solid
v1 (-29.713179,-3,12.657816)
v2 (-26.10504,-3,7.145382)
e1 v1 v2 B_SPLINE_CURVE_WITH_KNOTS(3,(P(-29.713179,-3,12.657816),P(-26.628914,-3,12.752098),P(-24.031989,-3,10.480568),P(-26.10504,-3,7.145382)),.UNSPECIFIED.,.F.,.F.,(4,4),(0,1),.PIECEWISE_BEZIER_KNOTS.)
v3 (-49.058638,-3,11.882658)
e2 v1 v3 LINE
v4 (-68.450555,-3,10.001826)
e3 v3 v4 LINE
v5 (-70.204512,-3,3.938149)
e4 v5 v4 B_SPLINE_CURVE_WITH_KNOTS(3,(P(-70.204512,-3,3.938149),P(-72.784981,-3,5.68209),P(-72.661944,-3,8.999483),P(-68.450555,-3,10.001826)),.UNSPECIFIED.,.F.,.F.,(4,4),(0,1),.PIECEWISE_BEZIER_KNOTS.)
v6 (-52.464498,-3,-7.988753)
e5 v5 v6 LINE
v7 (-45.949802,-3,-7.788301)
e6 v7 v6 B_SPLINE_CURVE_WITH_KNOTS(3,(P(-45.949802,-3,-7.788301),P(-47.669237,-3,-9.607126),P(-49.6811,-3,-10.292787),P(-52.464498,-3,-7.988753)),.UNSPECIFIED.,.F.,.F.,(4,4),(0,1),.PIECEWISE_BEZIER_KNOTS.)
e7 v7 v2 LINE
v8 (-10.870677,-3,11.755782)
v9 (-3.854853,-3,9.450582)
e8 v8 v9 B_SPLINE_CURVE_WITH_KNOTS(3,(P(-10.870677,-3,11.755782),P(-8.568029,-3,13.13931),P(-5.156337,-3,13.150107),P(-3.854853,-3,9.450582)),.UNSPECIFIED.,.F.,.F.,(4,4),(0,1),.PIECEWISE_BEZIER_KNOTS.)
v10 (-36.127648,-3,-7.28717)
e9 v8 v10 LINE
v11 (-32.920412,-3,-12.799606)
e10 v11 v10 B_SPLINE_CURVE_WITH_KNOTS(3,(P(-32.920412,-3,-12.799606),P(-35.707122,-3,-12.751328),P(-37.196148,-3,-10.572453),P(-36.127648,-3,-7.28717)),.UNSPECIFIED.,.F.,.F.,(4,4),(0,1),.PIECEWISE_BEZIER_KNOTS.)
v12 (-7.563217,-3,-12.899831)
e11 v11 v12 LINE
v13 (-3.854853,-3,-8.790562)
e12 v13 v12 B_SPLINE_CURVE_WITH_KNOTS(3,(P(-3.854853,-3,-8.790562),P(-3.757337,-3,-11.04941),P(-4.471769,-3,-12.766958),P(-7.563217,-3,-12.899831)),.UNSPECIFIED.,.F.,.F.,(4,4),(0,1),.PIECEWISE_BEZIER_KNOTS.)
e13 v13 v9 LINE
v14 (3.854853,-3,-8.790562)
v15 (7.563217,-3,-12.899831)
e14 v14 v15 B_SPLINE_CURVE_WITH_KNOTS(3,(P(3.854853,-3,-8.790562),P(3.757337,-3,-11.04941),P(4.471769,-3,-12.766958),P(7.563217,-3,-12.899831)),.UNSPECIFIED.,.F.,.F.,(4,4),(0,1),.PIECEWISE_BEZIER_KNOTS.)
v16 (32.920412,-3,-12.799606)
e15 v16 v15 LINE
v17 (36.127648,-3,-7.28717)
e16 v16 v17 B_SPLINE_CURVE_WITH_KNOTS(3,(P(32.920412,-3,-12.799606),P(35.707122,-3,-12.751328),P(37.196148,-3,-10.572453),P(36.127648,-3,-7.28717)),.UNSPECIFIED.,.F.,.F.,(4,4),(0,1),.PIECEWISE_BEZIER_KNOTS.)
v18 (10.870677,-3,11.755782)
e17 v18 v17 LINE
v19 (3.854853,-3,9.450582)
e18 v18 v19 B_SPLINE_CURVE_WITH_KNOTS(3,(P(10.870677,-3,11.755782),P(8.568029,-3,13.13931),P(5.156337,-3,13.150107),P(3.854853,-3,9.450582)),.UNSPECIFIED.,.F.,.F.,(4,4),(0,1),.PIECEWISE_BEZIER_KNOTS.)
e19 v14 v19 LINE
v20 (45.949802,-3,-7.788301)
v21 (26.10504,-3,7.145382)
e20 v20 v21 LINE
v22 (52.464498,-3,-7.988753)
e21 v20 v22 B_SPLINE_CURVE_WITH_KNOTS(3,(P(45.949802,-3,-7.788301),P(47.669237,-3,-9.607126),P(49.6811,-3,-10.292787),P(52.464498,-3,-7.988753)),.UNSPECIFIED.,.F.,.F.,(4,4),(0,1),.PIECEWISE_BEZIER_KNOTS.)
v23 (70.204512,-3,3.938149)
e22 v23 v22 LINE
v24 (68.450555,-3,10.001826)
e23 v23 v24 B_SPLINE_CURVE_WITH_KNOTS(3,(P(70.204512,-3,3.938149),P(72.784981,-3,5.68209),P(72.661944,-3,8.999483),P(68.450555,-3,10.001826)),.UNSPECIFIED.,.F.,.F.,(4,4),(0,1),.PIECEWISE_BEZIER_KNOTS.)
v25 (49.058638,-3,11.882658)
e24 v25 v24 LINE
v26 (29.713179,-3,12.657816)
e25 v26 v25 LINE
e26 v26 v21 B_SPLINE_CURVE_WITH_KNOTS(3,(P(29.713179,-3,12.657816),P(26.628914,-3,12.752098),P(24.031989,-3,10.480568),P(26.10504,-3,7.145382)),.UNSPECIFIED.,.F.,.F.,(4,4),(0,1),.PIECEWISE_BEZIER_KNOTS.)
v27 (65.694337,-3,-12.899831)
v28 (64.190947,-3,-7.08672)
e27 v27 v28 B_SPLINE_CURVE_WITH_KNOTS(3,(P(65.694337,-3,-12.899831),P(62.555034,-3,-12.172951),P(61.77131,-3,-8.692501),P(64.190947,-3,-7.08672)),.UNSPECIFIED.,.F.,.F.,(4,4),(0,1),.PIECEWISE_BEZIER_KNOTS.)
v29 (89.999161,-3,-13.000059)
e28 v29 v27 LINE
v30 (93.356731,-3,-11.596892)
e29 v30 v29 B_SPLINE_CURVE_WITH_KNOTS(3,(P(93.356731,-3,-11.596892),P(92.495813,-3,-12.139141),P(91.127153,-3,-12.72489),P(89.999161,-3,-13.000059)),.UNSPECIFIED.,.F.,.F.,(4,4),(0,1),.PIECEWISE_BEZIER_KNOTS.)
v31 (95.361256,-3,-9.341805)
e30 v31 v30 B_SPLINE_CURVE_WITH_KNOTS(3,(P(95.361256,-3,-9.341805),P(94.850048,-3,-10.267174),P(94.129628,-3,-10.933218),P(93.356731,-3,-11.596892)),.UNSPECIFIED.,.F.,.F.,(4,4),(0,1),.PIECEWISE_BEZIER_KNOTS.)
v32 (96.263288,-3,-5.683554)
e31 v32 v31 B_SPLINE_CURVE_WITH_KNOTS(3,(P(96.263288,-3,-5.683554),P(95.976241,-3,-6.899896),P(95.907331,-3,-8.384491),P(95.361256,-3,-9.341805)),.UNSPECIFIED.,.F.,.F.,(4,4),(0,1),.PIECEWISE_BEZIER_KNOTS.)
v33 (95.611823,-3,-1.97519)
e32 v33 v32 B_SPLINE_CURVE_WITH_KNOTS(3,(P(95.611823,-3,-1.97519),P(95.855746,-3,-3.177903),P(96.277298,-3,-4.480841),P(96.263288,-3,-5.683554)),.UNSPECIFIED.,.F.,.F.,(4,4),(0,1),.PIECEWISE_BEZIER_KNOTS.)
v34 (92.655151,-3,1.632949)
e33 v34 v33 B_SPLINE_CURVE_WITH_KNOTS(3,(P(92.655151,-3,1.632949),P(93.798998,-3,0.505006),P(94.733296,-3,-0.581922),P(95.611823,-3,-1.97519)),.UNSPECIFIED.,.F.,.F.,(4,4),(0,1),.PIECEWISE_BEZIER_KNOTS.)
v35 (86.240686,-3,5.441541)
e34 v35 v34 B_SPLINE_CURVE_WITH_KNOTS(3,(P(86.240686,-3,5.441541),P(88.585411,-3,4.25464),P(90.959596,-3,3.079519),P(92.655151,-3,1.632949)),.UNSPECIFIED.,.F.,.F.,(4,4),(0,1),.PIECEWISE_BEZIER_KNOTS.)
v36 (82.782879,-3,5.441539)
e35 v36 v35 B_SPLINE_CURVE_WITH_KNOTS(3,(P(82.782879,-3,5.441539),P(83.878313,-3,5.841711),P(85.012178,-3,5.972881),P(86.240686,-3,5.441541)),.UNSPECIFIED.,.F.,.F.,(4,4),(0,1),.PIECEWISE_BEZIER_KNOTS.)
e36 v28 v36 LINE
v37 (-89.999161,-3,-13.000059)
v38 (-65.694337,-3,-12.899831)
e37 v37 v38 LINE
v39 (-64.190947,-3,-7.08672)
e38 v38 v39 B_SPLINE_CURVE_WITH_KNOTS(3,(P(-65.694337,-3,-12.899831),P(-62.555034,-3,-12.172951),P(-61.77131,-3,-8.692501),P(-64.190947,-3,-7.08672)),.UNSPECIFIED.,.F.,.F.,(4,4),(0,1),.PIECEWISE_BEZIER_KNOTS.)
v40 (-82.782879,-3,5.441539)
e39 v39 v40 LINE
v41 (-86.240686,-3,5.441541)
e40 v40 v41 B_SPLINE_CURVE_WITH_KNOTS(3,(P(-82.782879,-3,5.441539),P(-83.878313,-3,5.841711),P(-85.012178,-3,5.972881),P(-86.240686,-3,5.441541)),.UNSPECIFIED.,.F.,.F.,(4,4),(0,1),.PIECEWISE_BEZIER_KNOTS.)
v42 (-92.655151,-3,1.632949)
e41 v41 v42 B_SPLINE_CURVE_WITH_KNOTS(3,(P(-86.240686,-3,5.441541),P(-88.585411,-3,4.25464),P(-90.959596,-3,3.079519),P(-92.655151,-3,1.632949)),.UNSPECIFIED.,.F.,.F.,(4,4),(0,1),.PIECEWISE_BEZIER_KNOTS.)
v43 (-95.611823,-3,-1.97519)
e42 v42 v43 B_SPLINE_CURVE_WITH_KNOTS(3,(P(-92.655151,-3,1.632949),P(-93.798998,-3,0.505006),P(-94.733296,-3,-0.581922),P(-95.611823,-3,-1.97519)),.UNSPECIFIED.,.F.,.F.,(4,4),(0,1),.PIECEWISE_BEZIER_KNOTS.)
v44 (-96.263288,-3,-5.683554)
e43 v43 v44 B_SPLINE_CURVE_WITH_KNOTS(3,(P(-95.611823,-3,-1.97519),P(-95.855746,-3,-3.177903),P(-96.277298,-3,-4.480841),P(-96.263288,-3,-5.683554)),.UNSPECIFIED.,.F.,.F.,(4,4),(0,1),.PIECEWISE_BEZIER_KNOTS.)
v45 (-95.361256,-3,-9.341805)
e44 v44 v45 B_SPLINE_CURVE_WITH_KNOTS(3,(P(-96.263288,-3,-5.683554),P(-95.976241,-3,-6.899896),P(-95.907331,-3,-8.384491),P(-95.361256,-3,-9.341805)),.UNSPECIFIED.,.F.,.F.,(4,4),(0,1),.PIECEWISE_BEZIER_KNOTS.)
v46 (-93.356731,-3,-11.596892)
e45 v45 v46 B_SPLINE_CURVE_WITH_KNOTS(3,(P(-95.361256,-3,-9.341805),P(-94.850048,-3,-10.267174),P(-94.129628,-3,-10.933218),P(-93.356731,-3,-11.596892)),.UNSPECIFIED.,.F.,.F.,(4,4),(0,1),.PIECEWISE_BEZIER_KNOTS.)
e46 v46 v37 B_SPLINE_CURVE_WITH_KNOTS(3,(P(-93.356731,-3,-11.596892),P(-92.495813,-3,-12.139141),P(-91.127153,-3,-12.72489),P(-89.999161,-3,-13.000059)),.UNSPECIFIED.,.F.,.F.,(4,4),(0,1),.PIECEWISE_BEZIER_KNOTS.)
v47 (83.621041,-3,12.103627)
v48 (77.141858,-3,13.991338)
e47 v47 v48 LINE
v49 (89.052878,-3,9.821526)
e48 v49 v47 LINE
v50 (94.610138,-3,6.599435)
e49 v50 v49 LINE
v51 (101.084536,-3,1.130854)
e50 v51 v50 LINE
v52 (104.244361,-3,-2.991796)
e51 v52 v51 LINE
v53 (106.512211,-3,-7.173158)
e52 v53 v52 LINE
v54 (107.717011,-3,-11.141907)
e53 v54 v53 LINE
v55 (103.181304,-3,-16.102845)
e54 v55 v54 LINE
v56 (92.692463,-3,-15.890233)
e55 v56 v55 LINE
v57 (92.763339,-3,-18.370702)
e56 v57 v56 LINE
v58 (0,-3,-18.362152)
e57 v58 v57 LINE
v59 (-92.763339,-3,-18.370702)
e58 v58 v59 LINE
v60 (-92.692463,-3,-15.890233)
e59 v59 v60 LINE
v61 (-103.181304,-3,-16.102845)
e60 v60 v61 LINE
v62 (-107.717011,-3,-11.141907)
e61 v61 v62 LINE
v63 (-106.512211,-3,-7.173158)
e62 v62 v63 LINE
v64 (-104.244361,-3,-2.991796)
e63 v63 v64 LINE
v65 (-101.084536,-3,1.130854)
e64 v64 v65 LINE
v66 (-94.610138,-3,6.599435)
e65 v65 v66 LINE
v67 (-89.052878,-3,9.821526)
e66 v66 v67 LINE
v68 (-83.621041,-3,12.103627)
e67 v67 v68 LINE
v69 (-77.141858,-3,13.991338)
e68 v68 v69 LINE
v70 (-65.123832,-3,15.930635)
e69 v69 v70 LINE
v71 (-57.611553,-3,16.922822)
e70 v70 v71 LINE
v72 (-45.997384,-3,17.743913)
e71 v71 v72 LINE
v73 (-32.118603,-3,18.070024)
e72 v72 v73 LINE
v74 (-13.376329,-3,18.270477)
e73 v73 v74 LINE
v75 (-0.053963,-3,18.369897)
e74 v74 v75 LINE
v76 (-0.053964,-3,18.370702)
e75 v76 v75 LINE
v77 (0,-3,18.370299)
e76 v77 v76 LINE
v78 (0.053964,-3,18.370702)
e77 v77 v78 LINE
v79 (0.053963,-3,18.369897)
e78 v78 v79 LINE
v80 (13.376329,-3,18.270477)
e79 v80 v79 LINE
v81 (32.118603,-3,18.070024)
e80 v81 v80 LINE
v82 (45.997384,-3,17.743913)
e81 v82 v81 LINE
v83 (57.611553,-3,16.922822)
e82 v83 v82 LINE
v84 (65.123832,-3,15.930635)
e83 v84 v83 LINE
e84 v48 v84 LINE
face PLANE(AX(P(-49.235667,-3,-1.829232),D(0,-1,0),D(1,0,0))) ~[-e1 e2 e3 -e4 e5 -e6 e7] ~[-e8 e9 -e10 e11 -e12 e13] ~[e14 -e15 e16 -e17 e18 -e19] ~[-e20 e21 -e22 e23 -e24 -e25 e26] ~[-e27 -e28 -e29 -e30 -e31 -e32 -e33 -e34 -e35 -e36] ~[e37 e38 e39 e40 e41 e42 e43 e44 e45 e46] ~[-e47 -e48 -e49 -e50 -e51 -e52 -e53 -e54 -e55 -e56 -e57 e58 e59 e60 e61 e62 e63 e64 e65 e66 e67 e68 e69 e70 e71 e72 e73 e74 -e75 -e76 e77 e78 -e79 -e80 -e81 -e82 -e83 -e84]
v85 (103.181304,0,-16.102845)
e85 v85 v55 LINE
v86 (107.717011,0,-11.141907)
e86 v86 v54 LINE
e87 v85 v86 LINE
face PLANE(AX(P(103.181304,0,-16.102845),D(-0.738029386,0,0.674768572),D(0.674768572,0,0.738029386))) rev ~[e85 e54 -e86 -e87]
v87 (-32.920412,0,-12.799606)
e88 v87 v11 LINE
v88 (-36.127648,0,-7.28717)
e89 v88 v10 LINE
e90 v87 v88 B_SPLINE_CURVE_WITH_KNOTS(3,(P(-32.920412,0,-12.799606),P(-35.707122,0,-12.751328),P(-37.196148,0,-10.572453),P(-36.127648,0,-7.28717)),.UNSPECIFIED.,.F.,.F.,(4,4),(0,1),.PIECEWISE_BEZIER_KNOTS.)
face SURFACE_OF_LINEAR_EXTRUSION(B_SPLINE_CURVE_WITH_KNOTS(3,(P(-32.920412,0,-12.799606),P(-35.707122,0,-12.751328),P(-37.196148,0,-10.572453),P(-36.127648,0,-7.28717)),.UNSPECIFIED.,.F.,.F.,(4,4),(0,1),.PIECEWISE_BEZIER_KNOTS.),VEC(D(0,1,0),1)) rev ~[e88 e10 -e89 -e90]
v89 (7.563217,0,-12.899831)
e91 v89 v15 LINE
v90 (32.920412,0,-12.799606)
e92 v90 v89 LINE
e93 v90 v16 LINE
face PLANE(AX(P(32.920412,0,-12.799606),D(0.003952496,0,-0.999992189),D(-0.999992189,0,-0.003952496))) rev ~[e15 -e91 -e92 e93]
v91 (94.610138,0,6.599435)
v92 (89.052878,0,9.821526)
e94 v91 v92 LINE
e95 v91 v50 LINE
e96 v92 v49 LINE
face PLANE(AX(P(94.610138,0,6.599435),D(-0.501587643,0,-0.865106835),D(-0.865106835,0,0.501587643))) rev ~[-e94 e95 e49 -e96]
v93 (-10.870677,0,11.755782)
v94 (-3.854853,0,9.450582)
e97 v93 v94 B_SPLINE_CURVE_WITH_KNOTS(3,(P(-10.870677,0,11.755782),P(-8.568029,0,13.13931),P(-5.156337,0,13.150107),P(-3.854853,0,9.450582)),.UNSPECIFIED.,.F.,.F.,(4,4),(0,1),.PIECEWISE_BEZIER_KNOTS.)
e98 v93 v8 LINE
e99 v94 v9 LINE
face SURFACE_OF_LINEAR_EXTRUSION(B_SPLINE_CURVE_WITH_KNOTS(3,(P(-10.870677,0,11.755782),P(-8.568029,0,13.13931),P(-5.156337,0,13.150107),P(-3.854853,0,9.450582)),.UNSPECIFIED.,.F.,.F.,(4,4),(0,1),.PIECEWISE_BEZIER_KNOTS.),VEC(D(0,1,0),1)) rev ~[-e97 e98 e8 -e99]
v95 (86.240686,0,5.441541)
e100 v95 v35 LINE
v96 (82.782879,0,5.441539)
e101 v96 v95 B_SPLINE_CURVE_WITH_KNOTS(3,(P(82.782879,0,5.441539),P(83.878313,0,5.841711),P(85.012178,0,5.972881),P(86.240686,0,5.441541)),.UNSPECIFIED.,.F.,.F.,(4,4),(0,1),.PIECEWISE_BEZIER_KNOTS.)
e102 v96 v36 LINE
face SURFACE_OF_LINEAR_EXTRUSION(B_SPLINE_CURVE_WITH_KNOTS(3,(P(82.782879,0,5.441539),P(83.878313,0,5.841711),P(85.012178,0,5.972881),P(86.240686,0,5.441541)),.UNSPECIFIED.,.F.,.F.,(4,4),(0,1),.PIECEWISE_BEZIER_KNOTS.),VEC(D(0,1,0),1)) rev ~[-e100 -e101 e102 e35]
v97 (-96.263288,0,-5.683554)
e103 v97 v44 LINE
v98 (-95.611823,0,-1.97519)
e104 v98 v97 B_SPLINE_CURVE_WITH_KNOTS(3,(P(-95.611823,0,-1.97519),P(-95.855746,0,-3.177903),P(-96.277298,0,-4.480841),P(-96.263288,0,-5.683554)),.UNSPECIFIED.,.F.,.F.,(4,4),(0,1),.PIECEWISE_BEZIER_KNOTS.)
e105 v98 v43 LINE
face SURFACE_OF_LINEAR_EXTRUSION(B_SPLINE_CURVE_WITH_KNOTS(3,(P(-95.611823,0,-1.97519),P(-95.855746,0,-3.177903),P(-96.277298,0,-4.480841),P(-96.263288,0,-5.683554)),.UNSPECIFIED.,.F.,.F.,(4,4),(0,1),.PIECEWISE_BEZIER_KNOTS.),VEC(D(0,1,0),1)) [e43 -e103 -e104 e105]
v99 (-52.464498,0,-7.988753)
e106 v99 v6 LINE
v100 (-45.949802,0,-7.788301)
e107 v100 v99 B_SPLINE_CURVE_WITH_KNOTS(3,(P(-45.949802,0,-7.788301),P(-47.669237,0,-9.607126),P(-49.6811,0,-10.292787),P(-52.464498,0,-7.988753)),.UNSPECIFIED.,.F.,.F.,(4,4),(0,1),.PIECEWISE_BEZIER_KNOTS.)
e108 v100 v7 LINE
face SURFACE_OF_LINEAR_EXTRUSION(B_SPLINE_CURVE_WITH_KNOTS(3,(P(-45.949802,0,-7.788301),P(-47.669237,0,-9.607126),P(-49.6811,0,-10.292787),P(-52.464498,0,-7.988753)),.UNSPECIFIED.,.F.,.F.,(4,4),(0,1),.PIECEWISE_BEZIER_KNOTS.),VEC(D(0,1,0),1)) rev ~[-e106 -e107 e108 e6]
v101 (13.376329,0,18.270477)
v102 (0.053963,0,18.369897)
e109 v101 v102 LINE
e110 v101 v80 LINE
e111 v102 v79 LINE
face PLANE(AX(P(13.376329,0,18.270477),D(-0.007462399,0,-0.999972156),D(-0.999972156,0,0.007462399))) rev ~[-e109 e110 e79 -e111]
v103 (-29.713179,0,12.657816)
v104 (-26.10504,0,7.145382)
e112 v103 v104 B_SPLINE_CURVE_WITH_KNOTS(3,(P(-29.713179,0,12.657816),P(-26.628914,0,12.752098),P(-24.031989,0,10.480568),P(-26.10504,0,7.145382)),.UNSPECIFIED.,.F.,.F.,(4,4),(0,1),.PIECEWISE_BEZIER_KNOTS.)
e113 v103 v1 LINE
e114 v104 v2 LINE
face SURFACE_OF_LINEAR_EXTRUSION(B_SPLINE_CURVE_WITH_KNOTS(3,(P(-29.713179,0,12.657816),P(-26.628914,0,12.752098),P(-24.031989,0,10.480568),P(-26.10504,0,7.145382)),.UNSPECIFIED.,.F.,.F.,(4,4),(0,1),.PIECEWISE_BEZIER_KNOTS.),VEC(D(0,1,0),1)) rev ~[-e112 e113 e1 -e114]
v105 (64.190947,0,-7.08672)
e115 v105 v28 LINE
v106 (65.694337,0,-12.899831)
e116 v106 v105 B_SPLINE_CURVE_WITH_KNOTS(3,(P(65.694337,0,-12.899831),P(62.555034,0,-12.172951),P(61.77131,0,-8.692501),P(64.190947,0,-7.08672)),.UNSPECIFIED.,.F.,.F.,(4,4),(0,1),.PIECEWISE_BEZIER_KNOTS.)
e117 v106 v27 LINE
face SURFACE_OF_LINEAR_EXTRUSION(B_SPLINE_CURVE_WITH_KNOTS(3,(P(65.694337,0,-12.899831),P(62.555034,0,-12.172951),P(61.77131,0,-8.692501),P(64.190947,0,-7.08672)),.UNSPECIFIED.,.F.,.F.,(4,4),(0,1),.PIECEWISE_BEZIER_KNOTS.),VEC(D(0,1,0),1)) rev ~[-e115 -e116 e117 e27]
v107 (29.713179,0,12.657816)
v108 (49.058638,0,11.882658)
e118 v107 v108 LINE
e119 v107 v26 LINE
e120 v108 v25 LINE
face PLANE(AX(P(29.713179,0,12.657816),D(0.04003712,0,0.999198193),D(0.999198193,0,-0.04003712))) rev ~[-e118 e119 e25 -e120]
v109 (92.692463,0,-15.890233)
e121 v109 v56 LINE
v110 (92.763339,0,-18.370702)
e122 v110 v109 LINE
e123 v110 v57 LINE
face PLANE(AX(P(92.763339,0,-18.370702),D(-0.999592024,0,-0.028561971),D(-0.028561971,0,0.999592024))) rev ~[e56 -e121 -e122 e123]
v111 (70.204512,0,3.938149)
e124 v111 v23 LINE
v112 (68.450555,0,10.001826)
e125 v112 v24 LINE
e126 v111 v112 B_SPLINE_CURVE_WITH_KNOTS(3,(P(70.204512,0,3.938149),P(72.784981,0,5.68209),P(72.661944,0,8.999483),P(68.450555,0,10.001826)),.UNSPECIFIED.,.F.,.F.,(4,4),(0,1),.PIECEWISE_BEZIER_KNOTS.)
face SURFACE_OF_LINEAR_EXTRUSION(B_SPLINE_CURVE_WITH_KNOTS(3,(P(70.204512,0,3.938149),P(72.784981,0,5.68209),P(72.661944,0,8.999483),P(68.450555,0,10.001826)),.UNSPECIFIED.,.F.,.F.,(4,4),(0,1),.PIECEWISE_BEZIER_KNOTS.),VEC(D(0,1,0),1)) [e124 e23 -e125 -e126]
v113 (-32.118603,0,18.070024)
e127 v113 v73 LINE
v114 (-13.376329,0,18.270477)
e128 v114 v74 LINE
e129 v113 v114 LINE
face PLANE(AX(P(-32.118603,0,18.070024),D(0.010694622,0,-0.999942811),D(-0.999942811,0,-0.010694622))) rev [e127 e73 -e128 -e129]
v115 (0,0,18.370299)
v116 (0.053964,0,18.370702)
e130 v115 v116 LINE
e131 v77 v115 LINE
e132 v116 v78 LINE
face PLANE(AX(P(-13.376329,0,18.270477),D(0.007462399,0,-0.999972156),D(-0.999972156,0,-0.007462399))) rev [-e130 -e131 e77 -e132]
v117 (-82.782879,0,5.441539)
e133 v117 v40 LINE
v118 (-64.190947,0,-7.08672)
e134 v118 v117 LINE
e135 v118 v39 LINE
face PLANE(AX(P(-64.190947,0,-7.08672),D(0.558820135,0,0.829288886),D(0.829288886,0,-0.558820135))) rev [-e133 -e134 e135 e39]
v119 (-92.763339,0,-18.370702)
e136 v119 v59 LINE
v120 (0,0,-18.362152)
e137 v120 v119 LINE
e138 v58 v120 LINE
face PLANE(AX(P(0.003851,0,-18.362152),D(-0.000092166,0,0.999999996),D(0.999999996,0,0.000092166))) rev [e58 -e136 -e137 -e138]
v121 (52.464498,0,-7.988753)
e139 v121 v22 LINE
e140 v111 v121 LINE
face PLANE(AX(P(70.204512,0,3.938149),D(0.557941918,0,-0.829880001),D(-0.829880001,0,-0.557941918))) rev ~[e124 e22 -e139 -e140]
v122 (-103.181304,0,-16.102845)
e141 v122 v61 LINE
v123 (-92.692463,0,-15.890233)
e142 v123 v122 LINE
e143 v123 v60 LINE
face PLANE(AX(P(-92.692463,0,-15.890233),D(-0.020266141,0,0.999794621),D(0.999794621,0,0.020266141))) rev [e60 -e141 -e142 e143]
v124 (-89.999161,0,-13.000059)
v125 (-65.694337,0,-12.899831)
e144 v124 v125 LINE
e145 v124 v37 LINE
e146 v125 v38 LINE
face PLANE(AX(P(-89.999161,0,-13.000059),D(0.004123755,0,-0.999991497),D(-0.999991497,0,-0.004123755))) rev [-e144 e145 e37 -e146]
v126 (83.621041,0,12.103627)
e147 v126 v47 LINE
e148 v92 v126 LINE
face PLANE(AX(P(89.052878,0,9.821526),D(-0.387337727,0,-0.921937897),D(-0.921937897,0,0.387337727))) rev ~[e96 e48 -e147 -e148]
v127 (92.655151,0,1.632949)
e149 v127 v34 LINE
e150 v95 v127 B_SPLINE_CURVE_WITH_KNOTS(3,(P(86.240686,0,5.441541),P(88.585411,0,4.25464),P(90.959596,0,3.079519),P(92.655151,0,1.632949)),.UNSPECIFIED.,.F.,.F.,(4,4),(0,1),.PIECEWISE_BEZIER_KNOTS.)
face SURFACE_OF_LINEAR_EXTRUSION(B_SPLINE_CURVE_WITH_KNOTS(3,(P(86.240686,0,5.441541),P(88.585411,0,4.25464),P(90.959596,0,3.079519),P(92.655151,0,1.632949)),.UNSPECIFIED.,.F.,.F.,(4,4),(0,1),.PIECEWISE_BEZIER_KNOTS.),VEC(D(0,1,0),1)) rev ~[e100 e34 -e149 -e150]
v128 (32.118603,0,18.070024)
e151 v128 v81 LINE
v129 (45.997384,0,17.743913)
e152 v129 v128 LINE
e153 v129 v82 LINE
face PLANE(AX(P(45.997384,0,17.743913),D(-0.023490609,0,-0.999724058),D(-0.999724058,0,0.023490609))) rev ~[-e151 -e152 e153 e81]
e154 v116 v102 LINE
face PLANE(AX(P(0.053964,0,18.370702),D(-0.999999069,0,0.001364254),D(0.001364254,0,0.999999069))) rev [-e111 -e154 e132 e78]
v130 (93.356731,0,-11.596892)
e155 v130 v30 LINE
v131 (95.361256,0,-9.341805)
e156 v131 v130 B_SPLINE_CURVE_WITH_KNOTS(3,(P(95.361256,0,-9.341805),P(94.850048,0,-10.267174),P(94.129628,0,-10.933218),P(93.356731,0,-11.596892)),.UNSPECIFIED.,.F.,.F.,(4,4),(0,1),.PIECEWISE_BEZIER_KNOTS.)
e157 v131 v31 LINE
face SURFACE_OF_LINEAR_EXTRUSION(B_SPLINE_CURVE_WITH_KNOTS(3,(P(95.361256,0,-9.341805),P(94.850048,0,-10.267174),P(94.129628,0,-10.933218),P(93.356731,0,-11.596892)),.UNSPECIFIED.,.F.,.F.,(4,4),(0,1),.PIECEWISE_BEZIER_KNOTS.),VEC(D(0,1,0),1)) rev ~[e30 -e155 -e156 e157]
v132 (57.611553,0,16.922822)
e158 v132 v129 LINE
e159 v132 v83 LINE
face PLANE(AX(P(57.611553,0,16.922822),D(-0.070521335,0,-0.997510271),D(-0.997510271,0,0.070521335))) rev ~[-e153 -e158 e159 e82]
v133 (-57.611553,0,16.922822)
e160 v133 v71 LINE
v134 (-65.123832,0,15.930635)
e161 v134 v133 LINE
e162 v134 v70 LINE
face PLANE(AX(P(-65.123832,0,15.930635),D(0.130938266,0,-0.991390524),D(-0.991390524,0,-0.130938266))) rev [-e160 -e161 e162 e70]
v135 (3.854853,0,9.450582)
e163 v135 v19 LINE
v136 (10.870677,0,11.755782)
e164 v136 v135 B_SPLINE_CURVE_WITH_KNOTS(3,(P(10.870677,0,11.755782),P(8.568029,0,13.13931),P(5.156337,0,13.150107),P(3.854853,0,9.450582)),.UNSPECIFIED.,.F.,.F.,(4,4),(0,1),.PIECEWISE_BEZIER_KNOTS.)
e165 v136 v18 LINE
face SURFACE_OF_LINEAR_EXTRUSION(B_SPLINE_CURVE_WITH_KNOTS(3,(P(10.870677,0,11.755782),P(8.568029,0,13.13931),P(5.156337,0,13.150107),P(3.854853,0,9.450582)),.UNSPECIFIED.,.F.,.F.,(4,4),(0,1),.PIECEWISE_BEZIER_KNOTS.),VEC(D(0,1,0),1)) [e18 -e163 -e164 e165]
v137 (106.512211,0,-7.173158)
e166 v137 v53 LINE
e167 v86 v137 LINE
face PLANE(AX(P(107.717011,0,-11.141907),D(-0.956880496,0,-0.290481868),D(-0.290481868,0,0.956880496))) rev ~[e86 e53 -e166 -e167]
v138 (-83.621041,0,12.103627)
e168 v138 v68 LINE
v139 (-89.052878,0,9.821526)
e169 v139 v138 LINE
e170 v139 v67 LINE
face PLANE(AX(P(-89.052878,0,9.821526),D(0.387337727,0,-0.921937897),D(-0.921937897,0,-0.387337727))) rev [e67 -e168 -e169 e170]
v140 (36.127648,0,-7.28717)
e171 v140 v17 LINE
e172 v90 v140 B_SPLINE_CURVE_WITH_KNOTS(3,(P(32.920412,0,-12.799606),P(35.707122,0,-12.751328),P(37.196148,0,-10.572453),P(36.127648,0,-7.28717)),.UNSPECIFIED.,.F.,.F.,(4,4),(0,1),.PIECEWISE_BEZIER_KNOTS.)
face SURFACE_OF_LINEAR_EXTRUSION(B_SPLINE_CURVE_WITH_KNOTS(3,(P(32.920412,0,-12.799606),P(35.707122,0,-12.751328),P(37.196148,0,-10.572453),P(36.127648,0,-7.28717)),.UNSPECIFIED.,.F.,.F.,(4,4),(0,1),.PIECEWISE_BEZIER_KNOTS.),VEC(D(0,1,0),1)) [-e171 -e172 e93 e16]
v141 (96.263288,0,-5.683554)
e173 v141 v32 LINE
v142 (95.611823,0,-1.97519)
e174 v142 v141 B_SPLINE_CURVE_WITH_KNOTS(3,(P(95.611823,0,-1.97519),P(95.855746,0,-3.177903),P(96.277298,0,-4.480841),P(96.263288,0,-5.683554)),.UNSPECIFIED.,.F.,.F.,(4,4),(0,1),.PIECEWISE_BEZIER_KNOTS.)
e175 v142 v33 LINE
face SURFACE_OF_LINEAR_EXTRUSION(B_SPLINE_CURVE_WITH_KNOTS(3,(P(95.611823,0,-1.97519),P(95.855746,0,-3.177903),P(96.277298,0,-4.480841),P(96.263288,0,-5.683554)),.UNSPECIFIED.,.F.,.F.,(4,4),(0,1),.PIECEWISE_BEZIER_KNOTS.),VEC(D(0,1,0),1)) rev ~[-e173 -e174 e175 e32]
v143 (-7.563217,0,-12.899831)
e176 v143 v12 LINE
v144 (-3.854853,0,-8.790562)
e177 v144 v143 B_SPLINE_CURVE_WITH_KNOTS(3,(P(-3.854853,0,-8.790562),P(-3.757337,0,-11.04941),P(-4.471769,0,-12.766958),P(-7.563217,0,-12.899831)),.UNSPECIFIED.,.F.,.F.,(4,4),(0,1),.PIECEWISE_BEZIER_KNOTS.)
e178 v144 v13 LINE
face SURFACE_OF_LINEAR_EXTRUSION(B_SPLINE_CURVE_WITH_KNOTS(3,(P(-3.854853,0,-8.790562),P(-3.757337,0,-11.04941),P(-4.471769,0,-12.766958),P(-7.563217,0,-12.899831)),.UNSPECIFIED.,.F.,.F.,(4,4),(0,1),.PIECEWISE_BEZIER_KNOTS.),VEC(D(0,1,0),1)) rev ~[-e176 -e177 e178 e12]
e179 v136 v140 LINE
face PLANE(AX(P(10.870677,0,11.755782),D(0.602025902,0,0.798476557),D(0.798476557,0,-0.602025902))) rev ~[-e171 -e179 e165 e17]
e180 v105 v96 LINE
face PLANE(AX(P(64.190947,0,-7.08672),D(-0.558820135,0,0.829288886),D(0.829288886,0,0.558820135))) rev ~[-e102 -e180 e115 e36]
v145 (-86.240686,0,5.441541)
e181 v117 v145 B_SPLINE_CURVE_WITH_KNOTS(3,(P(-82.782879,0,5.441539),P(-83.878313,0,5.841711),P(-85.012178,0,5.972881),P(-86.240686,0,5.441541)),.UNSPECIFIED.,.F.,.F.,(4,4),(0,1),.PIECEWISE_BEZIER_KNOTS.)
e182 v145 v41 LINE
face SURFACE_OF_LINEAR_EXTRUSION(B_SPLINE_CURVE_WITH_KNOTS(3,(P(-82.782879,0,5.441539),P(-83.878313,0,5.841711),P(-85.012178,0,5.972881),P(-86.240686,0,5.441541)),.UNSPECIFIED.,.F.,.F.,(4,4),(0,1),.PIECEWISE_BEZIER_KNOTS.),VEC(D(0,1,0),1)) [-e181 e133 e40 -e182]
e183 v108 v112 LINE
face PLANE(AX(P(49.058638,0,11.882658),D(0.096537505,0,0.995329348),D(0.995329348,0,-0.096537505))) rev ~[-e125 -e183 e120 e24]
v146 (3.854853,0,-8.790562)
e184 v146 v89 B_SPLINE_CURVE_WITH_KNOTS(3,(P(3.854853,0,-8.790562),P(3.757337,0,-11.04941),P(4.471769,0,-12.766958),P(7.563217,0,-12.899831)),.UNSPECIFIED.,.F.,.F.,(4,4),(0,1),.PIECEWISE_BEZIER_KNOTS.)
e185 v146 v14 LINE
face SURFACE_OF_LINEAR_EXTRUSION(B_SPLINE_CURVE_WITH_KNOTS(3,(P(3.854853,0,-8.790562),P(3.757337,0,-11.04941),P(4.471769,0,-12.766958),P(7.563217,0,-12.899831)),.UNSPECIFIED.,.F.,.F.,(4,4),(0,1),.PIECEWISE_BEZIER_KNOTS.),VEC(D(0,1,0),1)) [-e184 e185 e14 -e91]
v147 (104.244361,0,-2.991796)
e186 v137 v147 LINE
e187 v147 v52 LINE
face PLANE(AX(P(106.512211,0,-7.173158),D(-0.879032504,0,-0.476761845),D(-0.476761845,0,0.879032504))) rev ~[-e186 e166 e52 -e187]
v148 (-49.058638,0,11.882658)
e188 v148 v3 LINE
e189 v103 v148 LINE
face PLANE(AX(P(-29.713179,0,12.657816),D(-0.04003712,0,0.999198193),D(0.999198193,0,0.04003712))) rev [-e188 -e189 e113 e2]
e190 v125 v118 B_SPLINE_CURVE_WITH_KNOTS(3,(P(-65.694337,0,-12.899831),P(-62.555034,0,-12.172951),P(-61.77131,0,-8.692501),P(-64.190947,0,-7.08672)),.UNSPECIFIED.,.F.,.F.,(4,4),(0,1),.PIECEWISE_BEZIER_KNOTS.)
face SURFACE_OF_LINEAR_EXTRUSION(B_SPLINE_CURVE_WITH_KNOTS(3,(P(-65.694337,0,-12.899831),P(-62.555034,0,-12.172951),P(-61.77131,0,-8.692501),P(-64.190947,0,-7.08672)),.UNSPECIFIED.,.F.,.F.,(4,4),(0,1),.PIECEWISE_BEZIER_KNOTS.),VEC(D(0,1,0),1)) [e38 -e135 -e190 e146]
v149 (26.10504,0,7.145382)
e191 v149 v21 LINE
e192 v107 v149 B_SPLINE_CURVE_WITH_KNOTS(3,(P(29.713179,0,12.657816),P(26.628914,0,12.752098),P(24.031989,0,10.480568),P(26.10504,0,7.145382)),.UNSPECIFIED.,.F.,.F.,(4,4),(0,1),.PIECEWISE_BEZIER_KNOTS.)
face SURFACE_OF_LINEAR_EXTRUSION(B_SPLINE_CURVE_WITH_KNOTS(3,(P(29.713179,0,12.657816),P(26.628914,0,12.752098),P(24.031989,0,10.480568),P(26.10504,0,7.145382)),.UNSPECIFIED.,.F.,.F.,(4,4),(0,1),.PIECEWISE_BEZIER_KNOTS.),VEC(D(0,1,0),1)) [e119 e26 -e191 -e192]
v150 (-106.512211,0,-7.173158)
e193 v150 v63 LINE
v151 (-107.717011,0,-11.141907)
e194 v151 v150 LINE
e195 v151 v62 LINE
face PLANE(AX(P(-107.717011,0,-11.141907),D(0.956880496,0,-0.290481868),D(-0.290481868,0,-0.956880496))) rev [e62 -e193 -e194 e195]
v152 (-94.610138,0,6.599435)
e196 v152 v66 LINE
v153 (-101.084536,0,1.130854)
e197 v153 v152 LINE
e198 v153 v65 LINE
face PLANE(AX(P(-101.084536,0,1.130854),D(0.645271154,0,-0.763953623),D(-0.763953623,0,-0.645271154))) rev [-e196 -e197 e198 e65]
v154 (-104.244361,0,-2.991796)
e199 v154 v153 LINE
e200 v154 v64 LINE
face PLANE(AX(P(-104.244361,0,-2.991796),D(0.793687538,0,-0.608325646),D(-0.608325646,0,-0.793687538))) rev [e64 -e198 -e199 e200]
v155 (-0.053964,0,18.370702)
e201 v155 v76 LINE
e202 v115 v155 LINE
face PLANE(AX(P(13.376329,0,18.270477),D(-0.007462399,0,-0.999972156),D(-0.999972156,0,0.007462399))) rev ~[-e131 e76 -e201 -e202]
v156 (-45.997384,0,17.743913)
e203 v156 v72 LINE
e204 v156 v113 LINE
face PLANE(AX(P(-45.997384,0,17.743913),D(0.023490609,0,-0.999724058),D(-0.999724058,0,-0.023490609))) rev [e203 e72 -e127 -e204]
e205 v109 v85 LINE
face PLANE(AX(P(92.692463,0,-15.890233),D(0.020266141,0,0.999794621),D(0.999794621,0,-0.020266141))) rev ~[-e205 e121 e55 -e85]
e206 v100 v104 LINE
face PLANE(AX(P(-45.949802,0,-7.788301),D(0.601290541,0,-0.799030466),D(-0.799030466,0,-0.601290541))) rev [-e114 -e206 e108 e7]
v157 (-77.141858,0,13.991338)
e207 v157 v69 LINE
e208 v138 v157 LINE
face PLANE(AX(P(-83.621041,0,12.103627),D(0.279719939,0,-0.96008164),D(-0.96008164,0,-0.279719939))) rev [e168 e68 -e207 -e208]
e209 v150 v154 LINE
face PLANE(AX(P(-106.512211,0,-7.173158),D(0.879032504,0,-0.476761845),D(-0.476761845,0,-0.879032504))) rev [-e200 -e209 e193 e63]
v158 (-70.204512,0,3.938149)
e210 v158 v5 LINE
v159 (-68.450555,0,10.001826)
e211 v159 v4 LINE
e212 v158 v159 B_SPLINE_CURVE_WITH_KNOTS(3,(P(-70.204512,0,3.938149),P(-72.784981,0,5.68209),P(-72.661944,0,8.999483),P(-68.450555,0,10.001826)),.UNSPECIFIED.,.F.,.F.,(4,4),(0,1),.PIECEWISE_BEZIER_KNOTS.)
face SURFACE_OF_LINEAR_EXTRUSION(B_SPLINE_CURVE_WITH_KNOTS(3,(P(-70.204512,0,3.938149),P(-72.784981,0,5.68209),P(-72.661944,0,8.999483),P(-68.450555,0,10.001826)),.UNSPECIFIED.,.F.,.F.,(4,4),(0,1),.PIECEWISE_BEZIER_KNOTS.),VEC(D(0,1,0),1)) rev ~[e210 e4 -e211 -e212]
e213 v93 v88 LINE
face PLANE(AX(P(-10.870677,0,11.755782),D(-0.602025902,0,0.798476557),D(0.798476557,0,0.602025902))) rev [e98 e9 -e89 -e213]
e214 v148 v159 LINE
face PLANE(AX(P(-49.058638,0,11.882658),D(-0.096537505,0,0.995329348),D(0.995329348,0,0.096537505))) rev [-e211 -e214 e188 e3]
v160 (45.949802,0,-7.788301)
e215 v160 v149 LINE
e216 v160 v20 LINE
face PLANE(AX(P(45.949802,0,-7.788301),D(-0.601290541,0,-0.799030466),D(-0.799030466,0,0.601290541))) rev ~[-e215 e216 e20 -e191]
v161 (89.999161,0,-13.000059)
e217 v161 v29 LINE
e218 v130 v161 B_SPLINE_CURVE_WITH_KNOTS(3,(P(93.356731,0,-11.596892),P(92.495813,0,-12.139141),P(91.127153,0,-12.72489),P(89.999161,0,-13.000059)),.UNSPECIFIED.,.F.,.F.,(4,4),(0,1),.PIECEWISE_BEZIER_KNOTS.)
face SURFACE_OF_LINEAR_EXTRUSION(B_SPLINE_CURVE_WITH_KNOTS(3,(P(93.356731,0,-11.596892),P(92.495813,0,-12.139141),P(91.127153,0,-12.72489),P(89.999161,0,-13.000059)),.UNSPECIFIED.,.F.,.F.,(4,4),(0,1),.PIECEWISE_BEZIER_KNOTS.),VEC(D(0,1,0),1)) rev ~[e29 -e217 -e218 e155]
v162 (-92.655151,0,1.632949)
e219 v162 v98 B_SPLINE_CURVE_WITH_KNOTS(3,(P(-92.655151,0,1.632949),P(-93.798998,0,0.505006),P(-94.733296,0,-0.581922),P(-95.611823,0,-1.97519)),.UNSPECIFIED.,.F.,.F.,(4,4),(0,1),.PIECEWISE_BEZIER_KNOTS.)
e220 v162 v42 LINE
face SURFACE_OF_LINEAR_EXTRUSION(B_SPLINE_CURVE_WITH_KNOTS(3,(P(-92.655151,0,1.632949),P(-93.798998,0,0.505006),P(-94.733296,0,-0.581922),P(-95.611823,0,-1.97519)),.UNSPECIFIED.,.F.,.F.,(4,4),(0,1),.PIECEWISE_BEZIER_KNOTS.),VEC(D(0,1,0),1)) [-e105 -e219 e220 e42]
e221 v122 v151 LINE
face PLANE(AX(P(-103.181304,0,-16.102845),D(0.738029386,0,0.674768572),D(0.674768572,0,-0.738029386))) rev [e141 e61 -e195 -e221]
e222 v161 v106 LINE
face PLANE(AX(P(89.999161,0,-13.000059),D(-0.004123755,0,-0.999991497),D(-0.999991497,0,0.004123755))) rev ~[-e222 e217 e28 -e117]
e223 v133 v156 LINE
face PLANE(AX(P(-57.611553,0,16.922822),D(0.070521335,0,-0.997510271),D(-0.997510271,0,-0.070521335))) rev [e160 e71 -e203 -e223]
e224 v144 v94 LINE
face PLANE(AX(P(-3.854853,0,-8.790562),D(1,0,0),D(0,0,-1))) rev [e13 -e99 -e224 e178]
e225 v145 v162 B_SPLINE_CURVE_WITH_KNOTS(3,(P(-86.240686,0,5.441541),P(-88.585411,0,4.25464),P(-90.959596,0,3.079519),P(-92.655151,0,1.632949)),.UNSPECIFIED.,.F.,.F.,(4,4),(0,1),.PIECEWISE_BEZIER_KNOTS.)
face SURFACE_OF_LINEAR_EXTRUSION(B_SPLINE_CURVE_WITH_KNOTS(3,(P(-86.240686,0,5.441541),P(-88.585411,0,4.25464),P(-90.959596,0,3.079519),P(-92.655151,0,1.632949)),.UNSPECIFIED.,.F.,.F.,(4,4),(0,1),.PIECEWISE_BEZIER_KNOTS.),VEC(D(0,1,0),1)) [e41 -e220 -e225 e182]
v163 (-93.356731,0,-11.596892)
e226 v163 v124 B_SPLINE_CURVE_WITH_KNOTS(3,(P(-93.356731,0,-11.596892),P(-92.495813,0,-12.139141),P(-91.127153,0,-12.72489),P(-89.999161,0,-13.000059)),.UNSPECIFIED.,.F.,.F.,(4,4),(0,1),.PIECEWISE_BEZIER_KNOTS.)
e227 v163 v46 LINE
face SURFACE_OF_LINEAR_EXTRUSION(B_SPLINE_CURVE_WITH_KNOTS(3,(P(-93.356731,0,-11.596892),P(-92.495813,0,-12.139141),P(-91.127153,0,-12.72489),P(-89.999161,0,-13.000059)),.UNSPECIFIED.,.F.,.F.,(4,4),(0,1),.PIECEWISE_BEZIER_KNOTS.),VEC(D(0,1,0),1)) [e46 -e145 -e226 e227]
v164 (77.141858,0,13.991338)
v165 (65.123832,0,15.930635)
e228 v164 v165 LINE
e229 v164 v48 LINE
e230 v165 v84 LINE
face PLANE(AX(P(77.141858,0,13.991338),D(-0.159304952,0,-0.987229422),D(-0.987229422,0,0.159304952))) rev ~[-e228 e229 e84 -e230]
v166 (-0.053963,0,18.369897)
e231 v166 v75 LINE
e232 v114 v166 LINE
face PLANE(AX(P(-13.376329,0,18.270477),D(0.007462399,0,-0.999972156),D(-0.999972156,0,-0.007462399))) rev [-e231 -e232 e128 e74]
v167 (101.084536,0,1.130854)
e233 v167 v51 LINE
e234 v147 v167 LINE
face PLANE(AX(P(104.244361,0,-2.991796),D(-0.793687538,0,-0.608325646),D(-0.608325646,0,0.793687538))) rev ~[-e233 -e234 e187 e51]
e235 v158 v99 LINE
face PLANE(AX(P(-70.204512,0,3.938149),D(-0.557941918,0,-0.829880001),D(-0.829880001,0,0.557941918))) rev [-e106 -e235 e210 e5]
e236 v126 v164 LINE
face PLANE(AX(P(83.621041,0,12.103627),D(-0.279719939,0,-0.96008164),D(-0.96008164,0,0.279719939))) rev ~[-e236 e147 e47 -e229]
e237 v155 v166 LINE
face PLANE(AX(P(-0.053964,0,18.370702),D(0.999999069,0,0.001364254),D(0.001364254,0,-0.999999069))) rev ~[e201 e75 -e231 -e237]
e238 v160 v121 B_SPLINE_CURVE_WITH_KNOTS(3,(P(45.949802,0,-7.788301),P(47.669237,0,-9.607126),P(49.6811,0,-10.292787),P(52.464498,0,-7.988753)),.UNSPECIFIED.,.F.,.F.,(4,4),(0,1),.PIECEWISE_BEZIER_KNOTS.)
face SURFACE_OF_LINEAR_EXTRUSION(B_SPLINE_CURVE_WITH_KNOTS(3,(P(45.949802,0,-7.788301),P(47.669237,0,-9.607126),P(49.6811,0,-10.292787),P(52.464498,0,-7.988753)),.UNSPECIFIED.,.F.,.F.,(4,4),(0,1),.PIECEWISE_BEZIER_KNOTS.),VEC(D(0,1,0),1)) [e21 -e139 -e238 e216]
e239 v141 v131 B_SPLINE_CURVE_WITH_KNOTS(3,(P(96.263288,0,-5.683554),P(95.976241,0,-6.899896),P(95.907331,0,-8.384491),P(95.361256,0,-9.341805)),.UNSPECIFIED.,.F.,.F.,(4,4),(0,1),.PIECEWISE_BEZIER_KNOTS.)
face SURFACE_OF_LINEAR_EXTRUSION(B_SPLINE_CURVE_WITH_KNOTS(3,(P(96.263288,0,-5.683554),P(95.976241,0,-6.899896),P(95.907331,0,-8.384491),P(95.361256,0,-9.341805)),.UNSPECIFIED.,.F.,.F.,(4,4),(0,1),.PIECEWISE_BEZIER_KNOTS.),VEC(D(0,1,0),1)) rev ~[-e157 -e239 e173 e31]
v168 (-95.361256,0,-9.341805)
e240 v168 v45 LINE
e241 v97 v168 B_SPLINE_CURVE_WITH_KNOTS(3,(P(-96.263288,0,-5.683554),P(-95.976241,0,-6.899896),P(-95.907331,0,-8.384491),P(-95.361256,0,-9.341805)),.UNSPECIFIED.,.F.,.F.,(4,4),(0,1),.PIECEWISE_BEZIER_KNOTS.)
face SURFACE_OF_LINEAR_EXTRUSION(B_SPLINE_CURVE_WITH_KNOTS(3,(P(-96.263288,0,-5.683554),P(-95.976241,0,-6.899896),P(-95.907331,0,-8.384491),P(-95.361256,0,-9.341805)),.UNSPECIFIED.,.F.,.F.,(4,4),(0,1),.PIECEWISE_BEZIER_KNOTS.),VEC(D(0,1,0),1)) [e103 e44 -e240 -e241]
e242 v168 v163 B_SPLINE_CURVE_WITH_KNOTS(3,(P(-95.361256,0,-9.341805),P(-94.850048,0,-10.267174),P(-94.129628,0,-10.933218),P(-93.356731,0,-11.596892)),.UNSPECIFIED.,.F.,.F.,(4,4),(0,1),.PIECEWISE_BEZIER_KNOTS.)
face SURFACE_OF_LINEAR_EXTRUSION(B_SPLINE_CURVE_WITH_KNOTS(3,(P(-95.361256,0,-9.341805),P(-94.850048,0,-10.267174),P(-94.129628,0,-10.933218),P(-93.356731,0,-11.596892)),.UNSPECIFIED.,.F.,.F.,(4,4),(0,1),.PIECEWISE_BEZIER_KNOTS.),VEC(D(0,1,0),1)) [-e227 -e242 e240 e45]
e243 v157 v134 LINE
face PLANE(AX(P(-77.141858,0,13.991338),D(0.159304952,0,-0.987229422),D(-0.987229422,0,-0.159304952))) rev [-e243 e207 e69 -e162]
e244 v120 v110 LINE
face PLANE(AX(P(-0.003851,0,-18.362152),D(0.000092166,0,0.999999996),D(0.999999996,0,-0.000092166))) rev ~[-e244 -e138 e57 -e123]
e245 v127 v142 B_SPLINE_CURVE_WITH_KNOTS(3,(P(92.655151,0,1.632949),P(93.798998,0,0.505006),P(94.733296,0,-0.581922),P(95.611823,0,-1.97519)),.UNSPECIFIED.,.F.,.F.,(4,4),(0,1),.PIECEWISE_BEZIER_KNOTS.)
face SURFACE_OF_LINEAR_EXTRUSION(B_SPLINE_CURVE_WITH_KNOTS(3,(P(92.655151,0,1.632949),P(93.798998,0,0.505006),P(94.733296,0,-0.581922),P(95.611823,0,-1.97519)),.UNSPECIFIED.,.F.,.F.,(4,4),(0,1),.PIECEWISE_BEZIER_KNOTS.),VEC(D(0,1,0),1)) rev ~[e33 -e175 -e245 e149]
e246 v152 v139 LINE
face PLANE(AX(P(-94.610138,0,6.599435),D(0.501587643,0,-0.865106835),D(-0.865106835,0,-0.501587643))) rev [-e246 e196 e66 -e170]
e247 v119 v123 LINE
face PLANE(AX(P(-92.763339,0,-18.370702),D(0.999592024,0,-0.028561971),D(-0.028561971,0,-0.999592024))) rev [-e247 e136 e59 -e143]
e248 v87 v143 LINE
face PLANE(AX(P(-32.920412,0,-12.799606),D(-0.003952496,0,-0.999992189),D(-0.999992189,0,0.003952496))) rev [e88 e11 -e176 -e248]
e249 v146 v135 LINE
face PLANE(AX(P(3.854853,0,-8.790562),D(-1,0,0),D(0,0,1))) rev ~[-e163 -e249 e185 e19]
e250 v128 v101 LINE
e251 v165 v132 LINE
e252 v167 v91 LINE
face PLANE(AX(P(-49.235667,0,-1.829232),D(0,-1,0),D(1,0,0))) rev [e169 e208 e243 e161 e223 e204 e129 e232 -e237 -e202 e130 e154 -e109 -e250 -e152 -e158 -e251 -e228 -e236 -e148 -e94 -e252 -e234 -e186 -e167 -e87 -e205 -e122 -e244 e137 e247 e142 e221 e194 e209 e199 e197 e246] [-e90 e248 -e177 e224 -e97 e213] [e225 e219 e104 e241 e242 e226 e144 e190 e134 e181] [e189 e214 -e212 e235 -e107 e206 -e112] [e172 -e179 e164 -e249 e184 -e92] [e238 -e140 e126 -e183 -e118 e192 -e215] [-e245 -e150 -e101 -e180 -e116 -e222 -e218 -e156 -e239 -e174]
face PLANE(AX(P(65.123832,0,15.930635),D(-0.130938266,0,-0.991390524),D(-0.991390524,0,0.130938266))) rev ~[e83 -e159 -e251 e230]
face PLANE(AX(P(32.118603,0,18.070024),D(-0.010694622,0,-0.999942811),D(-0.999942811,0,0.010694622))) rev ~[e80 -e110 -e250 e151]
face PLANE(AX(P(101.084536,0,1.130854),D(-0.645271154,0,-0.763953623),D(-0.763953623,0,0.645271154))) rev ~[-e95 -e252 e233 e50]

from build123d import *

# Parameters (mm, degrees)
F1_DEPTH = 3


# Not quite as in the source:
# - ends of sketch curves that miss each other by under 0.0002 mm in the source are joined


with BuildPart() as f1:
    # F0 (on Front) → F1 (new body)
    with BuildSketch(Plane.XZ):
        Polygon((-0.0539638903, 18.370702), (-0.0038508903, -18.362152), (92.7633391097, -18.370702), (92.6924631097, -15.890233), (103.1813041097, -16.102845), (107.7170111097, -11.141907), (106.5122111097, -7.173158), (104.2443611097, -2.991796), (101.0845361097, 1.130854), (94.6101381097, 6.599435), (89.0528781097, 9.821526), (83.6210411097, 12.103627), (77.1418581097, 13.991338), (65.1238321097, 15.930635), (57.6115531097, 16.922822), (45.9973841097, 17.743913), (32.1186031097, 18.070024), (13.3763291097, 18.270477), align=None)
        with BuildLine():
            add(Edge.make_bspline(
                [(65.6943371097, -12.899831), (62.5550341097, -12.172951), (61.7713101097, -8.692501), (64.1909471097, -7.08672)],
                knots=[0, 0, 0, 0, 1, 1, 1, 1], degree=3))
            Line((64.1909471097, -7.08672), (82.7828791097, 5.441539))
            add(Edge.make_bspline(
                [(82.7828791097, 5.441539), (83.8783131097, 5.841711), (85.0121781097, 5.972881), (86.2406861097, 5.441541)],
                knots=[0, 0, 0, 0, 1, 1, 1, 1], degree=3))
            add(Edge.make_bspline(
                [(86.2406861097, 5.441541), (88.5854111097, 4.25464), (90.9595961097, 3.079519), (92.6551511097, 1.632949)],
                knots=[0, 0, 0, 0, 1, 1, 1, 1], degree=3))
            add(Edge.make_bspline(
                [(92.6551511097, 1.632949), (93.7989981097, 0.505006), (94.7332961097, -0.581922), (95.6118231097, -1.97519)],
                knots=[0, 0, 0, 0, 1, 1, 1, 1], degree=3))
            add(Edge.make_bspline(
                [(95.6118231097, -1.97519), (95.8557461097, -3.177903), (96.2772981097, -4.480841), (96.2632881097, -5.683554)],
                knots=[0, 0, 0, 0, 1, 1, 1, 1], degree=3))
            add(Edge.make_bspline(
                [(96.2632881097, -5.683554), (95.9762411097, -6.899896), (95.9073311097, -8.384491), (95.3612561097, -9.341805)],
                knots=[0, 0, 0, 0, 1, 1, 1, 1], degree=3))
            add(Edge.make_bspline(
                [(95.3612561097, -9.341805), (94.8500481097, -10.267174), (94.1296281097, -10.933218), (93.3567311097, -11.596892)],
                knots=[0, 0, 0, 0, 1, 1, 1, 1], degree=3))
            add(Edge.make_bspline(
                [(93.3567311097, -11.596892), (92.4958131097, -12.139141), (91.1271531097, -12.72489), (89.9991611097, -13.000059)],
                knots=[0, 0, 0, 0, 1, 1, 1, 1], degree=3))
            Line((89.9991611097, -13.000059), (65.6943371097, -12.899831))
        make_face(mode=Mode.SUBTRACT)
        with BuildLine():
            Line((3.8548531097, -8.790562), (3.8548531097, 9.450582))
            add(Edge.make_bspline(
                [(10.8706771097, 11.755782), (8.5680291097, 13.13931), (5.1563371097, 13.150107), (3.8548531097, 9.450582)],
                knots=[0, 0, 0, 0, 1, 1, 1, 1], degree=3))
            Line((10.8706771097, 11.755782), (36.1276481097, -7.28717))
            add(Edge.make_bspline(
                [(32.9204121097, -12.799606), (35.7071221097, -12.751328), (37.1961481097, -10.572453), (36.1276481097, -7.28717)],
                knots=[0, 0, 0, 0, 1, 1, 1, 1], degree=3))
            Line((32.9204121097, -12.799606), (7.5632171097, -12.899831))
            add(Edge.make_bspline(
                [(3.8548531097, -8.790562), (3.7573371097, -11.04941), (4.4717691097, -12.766958), (7.5632171097, -12.899831)],
                knots=[0, 0, 0, 0, 1, 1, 1, 1], degree=3))
        make_face(mode=Mode.SUBTRACT)
        with BuildLine():
            Line((45.9498021097, -7.788301), (26.1050401097, 7.145382))
            add(Edge.make_bspline(
                [(29.7131791097, 12.657816), (26.6289141097, 12.752098), (24.0319891097, 10.480568), (26.1050401097, 7.145382)],
                knots=[0, 0, 0, 0, 1, 1, 1, 1], degree=3))
            Line((29.7131791097, 12.657816), (49.0586381097, 11.882658))
            Line((49.0586381097, 11.882658), (68.4505551097, 10.001826))
            add(Edge.make_bspline(
                [(70.2045121097, 3.938149), (72.7849811097, 5.68209), (72.6619441097, 8.999483), (68.4505551097, 10.001826)],
                knots=[0, 0, 0, 0, 1, 1, 1, 1], degree=3))
            Line((70.2045121097, 3.938149), (52.4644981097, -7.988753))
            add(Edge.make_bspline(
                [(45.9498021097, -7.788301), (47.6692371097, -9.607126), (49.6811001097, -10.292787), (52.4644981097, -7.988753)],
                knots=[0, 0, 0, 0, 1, 1, 1, 1], degree=3))
        make_face(mode=Mode.SUBTRACT)
    extrude(amount=F1_DEPTH)

    # F2: F1 across plane


with BuildPart() as f1_1:
    add(f1.part)
    add(f1.part.mirror(Plane.YZ))


solid = f1_1.part
